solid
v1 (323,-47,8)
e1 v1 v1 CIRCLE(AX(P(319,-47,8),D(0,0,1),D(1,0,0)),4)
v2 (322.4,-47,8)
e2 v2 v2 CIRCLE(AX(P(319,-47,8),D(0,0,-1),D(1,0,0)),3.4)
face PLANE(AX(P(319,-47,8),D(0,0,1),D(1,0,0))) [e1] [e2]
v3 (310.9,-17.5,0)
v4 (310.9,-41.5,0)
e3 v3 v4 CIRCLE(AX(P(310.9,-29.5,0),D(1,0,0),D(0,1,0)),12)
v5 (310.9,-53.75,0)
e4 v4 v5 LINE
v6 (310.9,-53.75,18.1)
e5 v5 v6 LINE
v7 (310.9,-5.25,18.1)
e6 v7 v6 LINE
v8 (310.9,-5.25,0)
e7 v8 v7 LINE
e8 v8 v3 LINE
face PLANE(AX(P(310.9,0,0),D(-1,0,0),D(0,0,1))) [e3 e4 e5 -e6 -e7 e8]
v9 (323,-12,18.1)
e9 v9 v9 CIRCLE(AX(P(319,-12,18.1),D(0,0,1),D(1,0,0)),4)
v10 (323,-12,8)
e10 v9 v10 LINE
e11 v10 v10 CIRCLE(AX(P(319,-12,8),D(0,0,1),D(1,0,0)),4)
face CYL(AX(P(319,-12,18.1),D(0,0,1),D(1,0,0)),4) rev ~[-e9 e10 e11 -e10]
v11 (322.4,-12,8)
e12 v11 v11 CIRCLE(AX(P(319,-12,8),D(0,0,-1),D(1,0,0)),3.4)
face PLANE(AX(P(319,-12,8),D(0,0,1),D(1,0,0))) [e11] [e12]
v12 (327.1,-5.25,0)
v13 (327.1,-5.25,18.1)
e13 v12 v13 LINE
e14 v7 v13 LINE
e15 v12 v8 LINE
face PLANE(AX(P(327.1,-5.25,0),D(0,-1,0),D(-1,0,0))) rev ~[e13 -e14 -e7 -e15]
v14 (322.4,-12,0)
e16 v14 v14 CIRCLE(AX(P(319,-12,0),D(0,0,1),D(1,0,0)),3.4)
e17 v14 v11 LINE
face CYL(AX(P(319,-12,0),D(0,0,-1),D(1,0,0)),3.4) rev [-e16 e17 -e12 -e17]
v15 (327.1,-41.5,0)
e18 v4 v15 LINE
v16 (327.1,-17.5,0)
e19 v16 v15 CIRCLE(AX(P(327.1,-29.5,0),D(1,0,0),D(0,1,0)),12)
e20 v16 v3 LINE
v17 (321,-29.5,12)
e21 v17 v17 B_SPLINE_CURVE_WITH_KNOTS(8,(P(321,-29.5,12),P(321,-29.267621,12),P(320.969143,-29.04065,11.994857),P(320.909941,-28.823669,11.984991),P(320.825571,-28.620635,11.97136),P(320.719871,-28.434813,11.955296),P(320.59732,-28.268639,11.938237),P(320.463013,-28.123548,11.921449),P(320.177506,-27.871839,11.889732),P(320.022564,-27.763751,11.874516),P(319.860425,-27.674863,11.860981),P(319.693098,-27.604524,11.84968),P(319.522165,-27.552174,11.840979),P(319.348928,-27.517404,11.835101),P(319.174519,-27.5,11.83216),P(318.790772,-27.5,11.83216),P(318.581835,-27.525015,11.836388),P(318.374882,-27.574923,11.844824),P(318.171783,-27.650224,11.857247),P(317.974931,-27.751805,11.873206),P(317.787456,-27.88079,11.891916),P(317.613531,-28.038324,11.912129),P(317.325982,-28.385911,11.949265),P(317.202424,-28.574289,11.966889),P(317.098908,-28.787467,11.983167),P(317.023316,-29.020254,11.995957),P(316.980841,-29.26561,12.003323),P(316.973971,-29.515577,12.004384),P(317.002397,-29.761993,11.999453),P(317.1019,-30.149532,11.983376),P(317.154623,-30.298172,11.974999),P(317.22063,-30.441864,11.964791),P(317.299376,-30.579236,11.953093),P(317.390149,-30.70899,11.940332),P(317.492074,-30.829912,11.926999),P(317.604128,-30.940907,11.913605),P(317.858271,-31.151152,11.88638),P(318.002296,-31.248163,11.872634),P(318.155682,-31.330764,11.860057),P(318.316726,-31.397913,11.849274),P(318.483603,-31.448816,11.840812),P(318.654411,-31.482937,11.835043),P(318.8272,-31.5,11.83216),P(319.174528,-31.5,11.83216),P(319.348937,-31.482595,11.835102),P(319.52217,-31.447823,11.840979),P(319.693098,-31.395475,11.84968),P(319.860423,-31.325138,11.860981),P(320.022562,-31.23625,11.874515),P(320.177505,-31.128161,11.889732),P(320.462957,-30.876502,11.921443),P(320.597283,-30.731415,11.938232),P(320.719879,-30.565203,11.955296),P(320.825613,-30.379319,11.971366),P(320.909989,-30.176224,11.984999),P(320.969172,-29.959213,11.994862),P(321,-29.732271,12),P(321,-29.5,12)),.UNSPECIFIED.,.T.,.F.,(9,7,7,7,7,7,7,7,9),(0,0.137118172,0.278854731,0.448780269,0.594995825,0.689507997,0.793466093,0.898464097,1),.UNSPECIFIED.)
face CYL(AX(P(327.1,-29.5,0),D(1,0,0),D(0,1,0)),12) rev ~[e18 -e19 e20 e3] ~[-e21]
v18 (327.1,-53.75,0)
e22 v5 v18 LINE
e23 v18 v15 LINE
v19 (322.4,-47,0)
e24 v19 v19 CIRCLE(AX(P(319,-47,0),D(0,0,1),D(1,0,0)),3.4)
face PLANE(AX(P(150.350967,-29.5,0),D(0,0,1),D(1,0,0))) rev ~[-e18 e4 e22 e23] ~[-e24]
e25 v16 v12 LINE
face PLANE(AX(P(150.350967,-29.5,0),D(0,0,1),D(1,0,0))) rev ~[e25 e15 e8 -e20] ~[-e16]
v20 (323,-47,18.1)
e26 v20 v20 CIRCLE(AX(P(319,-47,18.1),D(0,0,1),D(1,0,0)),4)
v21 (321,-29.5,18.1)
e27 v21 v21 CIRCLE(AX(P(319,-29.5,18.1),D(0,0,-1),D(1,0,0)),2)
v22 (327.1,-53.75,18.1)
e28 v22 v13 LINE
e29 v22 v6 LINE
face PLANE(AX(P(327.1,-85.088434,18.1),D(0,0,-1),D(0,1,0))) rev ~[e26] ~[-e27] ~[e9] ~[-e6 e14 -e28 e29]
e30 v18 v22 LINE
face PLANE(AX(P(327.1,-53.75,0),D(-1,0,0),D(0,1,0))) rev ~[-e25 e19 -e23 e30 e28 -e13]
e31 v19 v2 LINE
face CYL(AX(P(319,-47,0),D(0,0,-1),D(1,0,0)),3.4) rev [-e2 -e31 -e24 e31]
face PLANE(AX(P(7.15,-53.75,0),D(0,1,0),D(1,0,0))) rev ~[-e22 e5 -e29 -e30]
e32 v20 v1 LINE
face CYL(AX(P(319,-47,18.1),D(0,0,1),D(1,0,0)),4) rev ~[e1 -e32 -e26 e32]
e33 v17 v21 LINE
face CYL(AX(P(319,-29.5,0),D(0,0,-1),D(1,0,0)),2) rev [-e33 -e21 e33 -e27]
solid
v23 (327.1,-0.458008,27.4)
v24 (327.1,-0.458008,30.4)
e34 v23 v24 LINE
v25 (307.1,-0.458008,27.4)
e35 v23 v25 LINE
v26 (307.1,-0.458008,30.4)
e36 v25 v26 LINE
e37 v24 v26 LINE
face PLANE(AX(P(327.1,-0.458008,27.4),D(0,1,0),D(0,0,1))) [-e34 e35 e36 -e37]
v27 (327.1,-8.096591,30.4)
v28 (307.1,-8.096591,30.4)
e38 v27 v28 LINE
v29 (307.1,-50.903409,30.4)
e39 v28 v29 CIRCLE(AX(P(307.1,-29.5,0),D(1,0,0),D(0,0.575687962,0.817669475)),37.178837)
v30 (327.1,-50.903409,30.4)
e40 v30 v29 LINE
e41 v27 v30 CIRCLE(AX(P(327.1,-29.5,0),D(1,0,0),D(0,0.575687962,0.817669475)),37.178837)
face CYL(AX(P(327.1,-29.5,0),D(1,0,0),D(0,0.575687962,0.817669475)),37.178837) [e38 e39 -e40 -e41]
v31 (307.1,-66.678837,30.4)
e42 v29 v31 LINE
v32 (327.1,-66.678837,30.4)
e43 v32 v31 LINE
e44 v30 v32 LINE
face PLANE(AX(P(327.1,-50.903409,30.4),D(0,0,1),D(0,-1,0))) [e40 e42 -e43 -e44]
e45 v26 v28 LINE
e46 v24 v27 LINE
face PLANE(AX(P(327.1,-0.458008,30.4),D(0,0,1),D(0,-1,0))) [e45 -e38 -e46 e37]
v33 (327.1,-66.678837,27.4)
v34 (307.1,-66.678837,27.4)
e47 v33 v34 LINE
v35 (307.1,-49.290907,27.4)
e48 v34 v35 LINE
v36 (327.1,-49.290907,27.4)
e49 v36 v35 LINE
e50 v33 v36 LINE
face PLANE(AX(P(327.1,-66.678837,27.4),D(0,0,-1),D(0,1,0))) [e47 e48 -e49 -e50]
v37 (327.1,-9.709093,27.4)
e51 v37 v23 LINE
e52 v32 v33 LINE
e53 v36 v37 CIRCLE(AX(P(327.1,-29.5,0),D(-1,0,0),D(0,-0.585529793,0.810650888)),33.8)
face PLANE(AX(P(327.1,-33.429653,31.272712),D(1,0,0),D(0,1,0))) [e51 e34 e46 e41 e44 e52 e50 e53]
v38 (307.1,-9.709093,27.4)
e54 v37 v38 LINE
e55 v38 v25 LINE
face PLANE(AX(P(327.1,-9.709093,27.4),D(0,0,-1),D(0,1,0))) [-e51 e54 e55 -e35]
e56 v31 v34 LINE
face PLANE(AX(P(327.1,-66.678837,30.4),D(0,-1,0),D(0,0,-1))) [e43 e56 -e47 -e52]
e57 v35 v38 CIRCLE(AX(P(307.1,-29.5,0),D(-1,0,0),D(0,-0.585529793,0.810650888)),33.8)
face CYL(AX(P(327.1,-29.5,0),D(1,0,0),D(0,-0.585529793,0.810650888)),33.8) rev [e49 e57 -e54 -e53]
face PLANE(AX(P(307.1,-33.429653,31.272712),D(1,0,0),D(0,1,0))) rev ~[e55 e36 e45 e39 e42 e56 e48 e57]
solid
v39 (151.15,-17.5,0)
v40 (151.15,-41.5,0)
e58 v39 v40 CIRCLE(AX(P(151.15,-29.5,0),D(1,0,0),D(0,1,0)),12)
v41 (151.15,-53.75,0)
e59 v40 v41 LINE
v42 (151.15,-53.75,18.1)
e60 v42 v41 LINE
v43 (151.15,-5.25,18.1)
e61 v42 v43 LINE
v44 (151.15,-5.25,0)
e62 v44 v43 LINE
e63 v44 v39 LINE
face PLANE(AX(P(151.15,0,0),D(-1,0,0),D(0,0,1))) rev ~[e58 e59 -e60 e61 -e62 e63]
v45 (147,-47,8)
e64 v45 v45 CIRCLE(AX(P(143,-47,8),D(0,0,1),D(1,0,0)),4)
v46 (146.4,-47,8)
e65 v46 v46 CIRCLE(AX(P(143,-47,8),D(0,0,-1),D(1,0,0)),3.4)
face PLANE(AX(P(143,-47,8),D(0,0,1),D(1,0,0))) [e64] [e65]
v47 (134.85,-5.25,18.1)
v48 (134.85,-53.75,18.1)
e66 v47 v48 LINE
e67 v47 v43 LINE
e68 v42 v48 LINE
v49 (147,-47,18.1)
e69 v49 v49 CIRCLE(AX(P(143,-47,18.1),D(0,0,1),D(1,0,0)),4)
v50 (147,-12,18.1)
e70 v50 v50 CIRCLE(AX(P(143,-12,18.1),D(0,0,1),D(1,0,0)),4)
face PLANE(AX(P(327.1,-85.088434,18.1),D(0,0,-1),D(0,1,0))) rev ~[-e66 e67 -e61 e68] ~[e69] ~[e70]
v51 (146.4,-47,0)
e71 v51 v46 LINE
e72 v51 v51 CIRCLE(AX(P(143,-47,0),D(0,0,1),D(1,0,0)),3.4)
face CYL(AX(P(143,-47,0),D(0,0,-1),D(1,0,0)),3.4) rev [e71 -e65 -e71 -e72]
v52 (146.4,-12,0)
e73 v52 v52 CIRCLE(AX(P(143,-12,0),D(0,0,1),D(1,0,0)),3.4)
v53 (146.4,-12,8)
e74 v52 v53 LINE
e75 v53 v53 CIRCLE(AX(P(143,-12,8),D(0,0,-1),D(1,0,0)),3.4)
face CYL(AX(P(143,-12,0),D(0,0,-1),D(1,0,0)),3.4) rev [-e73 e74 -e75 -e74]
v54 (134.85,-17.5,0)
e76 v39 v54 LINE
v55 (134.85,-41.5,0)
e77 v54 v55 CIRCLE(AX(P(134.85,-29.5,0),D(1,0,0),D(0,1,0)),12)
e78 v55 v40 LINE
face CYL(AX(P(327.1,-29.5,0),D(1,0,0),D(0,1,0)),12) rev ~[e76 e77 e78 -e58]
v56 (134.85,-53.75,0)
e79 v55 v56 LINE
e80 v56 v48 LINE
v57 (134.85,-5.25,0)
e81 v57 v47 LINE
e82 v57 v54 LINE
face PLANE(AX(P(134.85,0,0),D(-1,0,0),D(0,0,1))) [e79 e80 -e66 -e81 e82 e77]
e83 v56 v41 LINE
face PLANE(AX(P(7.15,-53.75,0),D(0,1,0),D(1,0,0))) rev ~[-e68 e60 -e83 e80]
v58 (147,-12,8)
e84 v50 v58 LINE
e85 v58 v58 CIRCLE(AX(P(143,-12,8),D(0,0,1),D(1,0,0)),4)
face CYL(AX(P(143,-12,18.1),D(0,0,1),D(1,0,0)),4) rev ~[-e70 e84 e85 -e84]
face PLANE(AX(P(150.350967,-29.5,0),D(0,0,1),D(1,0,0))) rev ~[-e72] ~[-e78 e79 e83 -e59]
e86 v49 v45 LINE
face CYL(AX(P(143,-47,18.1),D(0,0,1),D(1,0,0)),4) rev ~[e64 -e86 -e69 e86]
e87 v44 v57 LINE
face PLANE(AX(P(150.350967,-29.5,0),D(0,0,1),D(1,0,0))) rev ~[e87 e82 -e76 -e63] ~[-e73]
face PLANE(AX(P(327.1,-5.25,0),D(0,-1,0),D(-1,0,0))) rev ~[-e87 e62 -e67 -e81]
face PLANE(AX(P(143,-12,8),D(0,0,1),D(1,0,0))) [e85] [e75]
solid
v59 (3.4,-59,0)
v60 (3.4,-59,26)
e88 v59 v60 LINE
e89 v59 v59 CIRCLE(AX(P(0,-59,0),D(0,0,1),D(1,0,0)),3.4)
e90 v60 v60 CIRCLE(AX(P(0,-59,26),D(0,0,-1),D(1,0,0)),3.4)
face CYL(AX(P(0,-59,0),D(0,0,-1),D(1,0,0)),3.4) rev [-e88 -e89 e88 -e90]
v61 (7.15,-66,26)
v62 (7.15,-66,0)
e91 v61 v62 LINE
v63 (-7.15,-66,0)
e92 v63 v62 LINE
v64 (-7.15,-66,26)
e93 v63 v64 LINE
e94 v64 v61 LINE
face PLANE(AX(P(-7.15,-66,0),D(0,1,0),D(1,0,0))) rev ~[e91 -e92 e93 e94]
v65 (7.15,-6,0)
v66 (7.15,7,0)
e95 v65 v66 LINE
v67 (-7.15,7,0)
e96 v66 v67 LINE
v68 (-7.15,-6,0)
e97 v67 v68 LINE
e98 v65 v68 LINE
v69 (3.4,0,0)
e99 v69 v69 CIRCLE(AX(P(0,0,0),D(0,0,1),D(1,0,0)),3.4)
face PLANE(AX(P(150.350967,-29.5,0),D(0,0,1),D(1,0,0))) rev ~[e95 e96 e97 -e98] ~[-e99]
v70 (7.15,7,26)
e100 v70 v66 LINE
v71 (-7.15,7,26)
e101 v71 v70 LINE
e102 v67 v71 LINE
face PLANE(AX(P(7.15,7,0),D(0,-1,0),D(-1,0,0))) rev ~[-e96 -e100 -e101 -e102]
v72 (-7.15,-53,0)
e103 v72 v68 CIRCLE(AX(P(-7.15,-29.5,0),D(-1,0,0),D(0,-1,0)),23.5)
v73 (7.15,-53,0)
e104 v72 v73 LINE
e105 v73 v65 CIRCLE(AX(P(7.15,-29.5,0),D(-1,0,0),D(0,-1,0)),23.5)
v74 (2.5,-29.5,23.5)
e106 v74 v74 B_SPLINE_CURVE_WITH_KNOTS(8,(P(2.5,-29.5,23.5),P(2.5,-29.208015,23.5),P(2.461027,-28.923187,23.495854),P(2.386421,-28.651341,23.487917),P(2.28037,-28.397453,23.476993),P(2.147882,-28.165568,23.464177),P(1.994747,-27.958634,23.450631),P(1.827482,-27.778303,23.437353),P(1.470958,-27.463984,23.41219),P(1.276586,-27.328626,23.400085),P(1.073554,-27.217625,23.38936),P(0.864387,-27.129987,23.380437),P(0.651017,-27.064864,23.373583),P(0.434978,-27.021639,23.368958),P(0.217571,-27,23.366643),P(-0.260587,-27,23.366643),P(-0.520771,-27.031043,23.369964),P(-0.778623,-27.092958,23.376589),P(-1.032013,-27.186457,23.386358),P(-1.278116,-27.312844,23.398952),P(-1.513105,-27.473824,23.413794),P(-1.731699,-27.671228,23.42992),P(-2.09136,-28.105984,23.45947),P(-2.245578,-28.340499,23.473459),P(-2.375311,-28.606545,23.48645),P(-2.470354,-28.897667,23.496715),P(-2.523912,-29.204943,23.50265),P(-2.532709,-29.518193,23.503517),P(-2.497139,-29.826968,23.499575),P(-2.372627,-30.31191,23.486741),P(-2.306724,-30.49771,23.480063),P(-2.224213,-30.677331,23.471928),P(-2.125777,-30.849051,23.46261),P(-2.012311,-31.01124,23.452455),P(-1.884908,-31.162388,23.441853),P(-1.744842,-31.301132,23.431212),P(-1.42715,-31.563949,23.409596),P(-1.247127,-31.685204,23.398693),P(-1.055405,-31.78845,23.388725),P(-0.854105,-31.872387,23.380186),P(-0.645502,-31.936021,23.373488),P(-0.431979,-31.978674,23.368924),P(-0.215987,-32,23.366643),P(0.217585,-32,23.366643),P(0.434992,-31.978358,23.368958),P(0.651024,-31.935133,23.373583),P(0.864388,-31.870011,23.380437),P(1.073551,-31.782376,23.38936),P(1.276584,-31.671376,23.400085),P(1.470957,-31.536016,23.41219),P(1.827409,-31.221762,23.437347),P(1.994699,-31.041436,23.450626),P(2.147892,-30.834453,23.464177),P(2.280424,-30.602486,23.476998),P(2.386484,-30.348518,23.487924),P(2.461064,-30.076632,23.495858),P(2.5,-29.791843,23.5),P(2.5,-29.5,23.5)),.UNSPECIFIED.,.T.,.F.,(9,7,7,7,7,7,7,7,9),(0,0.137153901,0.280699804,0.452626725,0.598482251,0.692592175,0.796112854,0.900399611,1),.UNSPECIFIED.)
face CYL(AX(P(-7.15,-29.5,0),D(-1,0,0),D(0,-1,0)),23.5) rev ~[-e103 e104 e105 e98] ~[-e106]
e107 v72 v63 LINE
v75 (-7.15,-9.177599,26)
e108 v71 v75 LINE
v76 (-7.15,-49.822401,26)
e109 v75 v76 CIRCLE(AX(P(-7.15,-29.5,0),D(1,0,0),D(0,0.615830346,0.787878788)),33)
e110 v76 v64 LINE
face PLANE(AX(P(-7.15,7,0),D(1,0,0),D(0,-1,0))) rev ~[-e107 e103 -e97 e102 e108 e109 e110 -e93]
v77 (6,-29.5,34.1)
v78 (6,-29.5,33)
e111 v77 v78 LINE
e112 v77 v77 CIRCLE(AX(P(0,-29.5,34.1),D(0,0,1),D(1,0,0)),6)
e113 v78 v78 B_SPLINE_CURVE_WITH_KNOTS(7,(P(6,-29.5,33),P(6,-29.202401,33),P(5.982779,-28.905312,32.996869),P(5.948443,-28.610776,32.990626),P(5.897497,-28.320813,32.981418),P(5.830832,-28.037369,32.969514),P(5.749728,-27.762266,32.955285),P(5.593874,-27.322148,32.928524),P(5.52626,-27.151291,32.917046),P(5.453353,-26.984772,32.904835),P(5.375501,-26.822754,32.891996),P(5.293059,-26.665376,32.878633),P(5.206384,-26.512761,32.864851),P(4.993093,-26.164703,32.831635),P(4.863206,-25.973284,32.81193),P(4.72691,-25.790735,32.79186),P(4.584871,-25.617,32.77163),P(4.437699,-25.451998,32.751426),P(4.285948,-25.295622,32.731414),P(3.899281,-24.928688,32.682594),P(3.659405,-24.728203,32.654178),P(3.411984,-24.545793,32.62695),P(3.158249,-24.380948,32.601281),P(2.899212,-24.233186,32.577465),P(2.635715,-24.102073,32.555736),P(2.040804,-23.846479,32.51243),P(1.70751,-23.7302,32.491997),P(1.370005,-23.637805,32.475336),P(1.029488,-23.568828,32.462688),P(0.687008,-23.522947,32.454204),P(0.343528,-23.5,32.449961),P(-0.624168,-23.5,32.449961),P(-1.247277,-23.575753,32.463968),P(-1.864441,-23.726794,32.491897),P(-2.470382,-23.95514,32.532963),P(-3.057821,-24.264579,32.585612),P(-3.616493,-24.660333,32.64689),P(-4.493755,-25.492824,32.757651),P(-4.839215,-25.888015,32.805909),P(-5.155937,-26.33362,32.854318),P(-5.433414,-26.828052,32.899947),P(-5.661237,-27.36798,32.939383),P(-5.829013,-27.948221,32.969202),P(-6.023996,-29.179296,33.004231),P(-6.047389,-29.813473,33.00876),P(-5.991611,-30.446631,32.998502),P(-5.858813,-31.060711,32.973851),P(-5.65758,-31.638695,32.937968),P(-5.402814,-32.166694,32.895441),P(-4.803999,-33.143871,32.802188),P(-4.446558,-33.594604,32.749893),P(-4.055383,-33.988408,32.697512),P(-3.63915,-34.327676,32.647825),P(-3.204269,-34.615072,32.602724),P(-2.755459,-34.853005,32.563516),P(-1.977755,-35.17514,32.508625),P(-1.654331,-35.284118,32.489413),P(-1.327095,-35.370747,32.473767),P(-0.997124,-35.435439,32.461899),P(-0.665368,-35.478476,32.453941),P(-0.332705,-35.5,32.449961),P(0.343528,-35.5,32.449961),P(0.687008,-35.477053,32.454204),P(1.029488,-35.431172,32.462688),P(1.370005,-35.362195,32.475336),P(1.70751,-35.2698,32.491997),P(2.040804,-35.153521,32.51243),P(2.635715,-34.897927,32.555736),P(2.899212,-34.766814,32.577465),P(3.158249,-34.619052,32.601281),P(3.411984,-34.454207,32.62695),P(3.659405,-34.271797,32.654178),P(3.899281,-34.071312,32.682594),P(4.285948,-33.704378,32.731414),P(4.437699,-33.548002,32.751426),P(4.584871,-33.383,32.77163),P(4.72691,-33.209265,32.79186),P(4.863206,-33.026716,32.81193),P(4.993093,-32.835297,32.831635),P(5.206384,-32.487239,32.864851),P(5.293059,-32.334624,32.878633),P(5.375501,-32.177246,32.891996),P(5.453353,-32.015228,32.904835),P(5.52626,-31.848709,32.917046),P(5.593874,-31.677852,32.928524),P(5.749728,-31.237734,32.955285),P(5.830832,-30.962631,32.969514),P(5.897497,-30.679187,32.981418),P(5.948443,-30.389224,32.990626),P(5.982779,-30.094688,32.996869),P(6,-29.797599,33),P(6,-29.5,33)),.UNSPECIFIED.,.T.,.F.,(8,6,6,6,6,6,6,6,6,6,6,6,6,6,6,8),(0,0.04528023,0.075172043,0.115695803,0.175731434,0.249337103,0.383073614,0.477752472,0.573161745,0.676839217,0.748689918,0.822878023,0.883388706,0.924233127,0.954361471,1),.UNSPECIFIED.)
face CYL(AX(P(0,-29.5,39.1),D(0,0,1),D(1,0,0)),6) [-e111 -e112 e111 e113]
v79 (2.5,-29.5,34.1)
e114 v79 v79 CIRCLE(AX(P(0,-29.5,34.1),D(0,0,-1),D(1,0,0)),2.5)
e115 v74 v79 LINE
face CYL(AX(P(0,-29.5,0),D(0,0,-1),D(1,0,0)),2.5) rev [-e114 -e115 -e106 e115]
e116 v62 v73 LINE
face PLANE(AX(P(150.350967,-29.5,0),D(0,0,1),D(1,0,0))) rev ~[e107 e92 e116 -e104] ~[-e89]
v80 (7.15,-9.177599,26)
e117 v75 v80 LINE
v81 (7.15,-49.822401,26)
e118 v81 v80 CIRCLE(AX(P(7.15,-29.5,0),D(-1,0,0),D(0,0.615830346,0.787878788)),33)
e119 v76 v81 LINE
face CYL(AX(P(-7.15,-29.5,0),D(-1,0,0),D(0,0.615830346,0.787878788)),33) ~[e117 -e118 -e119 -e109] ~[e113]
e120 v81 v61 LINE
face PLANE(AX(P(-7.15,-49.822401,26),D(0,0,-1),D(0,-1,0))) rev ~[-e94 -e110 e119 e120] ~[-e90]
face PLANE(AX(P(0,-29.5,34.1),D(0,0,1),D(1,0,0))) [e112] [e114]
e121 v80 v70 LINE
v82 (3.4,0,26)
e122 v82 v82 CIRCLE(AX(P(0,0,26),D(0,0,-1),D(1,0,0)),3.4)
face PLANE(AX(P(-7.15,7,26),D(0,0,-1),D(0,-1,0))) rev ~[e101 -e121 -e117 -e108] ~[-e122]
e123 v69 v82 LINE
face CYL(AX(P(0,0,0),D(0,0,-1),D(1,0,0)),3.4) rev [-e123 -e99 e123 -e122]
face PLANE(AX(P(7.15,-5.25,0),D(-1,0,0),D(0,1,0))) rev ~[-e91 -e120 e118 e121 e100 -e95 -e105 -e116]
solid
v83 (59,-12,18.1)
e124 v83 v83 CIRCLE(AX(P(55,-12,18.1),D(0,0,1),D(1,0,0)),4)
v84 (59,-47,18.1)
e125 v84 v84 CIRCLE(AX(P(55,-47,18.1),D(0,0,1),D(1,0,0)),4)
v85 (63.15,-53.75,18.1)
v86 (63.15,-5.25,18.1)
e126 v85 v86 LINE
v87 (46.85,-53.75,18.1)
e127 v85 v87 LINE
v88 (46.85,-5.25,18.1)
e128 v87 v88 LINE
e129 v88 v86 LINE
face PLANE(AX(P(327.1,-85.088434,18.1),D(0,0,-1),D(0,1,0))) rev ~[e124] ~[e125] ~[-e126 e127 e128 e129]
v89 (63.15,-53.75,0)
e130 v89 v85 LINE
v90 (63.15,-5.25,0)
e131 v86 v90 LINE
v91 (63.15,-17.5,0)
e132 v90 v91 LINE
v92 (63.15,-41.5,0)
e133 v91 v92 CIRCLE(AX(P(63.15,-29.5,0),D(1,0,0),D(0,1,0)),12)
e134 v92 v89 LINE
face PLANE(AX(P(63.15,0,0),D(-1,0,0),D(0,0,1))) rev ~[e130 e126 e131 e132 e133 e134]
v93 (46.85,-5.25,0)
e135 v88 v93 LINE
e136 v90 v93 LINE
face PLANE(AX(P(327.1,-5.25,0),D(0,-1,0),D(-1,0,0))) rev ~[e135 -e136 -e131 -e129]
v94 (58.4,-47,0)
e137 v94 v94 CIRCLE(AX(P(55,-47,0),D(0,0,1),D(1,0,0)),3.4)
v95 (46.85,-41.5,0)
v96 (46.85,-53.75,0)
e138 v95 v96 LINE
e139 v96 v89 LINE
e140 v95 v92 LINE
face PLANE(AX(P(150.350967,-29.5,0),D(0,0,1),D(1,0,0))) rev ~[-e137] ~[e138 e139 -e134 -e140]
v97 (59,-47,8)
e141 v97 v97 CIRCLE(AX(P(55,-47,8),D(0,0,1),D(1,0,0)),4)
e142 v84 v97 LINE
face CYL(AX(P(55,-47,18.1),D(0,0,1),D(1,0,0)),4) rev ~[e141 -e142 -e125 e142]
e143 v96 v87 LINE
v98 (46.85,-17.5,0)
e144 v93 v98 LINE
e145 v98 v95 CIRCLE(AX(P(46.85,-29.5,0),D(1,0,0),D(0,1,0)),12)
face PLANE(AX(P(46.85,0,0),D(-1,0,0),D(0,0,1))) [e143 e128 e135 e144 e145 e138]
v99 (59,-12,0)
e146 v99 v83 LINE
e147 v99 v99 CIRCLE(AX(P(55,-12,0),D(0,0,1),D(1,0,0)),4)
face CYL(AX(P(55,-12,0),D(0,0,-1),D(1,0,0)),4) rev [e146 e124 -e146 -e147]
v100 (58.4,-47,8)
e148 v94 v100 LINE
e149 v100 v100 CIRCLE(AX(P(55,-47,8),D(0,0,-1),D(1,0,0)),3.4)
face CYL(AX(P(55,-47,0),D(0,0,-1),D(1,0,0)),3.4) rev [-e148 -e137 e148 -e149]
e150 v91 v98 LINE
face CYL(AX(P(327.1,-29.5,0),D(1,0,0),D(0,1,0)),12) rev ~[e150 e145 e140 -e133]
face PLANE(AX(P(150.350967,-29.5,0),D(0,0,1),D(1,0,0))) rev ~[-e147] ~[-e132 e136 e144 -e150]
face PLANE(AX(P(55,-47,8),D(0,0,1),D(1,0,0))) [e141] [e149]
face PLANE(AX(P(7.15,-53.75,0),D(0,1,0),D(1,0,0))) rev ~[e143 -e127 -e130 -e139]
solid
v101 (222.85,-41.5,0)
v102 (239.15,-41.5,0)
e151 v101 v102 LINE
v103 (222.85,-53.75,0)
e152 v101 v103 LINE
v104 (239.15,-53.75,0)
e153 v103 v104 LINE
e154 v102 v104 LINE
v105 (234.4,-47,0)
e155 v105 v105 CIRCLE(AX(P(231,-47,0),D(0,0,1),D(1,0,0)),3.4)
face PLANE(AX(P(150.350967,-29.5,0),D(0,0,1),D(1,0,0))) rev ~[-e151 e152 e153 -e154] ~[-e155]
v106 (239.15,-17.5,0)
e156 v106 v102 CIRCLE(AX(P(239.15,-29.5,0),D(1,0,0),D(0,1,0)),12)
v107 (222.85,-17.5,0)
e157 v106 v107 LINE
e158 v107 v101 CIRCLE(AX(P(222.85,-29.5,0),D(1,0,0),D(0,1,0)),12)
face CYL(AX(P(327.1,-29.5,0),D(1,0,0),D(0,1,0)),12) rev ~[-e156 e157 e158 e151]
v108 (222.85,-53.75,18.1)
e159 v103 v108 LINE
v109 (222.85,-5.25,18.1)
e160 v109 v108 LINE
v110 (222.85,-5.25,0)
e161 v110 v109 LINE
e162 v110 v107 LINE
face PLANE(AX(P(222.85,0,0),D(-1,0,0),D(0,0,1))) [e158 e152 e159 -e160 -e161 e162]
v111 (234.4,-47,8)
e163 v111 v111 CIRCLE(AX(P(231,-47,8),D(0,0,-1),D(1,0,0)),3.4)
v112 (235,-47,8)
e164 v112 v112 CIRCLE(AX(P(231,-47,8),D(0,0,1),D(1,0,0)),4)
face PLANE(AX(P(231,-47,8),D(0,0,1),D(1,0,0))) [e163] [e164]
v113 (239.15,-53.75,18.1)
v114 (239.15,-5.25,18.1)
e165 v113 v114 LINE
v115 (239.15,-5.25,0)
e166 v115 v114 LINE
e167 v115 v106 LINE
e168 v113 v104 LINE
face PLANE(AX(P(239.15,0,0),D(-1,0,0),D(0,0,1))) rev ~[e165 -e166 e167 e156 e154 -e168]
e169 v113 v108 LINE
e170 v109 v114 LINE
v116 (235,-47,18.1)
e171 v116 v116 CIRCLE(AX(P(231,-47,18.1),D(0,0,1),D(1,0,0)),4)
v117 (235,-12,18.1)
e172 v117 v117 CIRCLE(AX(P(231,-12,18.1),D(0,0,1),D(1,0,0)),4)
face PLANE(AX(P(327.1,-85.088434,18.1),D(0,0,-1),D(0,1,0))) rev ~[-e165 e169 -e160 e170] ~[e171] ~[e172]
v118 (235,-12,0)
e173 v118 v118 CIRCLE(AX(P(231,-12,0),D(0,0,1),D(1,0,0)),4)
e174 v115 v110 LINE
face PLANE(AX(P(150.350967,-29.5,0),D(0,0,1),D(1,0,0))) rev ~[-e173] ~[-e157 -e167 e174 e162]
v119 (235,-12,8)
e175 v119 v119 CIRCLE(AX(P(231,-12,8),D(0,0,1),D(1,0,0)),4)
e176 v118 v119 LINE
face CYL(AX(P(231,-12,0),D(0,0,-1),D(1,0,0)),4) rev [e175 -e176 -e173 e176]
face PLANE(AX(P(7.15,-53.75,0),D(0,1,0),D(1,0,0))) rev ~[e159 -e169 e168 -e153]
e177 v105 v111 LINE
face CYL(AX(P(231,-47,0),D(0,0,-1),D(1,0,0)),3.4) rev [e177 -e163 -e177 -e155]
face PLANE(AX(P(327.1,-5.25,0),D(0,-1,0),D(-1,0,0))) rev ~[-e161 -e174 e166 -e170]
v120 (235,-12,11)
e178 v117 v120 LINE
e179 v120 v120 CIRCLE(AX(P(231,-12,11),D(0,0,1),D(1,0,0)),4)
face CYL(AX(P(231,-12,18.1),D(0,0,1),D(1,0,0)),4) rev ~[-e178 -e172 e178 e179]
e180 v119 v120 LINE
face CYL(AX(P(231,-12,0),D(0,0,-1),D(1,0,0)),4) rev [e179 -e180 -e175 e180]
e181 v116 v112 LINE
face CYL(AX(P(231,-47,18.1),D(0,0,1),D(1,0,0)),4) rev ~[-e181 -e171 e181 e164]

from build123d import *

# Parameters (mm, degrees)
F2_DEPTH       = 39.1
F0_R           = 4
F0_R_2         = 3.4
F3_DEPTH       = 11
F4_R           = 12
F5_DEPTH       = 334.25
F6_R           = 23.5
F7_DEPTH       = 14.3
F8_W           = 39.7
F8_H           = 15.3
F8_W_2         = 71.7
F8_W_3         = 71.75
F9_DEPTH       = 53.75
F22_DEPTH      = 514
F16_R          = 24.75
F23_DEPTH      = 39.7
F17_R          = 25
F24_DEPTH      = 71.7
F18_R          = 25
F25_DEPTH      = 71.7
F19_R          = 25
F26_DEPTH      = 71.75
F28_DEPTH      = 18
F30_R          = 50
F30_R_2        = 30.8
F31_DEPTH      = 319.95
F32_END_RADIUS = 30.8
F15_R          = 6.5
F15_R_2        = 6
F32_REACH      = 57.4857763109
F0_R_3         = 2.5
F0_R_4         = 3
F0_R_5         = 2
F33_DEPTH      = 39.1010001
F35_DEPTH      = 20
F36_W          = 116.0697114092
F36_H          = 45.8095933202
F37_DEPTH      = 319.95
F38_W          = 39.7
F38_H          = 22.9808008298
F38_W_2        = 71.7
F38_H_2        = 22.1049790271
F38_H_3        = 21.3201404549
F38_W_3        = 71.75
F38_H_4        = 20.5597863533
F39_DEPTH      = 7.001
F39_DEPTH_BACK = 66.6798368476
F40_R          = 4
F41_DEPTH      = 10.1
F42_R          = 10
F43_DEPTH      = 5


# Not quite as in the source:
# - an extrude ends at something that could not be found from the text; its depth is read off the source's solid


with BuildPart() as f2:
    # F1 (on Top) → F2 (new body)
    with BuildSketch(Plane.XY):
        Polygon((7.15, 7), (-7.15, 7), (-7.15, -66), (7.15, -66), (7.15, -53.75), (327.1, -53.75), (327.1, -5.25), (7.15, -5.25), align=None)
    extrude(amount=F2_DEPTH)

    # F0 (on Top) → F3 (cut)
    with BuildSketch(Plane.XY):
        with Locations((55, -12)):
            Circle(F0_R)
        with Locations((55, -12)):
            Circle(F0_R_2, mode=Mode.SUBTRACT)
        with Locations((231, -12)):
            Circle(F0_R)
        with Locations((231, -12)):
            Circle(F0_R_2, mode=Mode.SUBTRACT)
    extrude(amount=F3_DEPTH, mode=Mode.SUBTRACT)

    # F4 (on face) → F5 (cut, through all)
    with BuildSketch(Plane.YZ.offset(327.1)):
        with Locations((-29.5, 0)):
            Circle(F4_R)
    extrude(amount=-F5_DEPTH, mode=Mode.SUBTRACT)

    # F6 (on face) → F7 (cut)
    with BuildSketch(Plane(origin=(-7.15, 0, 0), x_dir=(0, -1, 0), z_dir=(-1, 0, 0))):
        with Locations((29.5, 0)):
            Circle(F6_R)
    extrude(amount=-F7_DEPTH, mode=Mode.SUBTRACT)

    # F8 (on Front) → F9 (cut, through all)
    with BuildSketch(Plane.XZ):
        with Locations((27, 7.65)):
            Rectangle(F8_W, F8_H)
        with Locations((99, 7.65)):
            Rectangle(F8_W_2, F8_H)
        with Locations((187, 7.65)):
            Rectangle(F8_W_2, F8_H)
        with Locations((275.025, 7.65)):
            Rectangle(F8_W_3, F8_H)
    extrude(amount=F9_DEPTH, mode=Mode.SUBTRACT)

    # F21 (on offset) → F22 (cut, through all)
    with BuildSketch(Plane(origin=(-7.15, 0, 0), x_dir=(0, -1, 0), z_dir=(-1, 0, 0))):
        with BuildLine():
            ThreePointArc((9.1775985671, 26), (29.5, 33), (49.8224014329, 26))
            Line((49.8224014329, 26), (66, 26))
            Line((66, 26), (66, 39.1))
            Line((66, 39.1), (-7, 39.1))
            Line((-7, 39.1), (-7, 26))
            Line((-7, 26), (9.1775985671, 26))
        make_face()
    extrude(amount=-F22_DEPTH, mode=Mode.SUBTRACT)

    # F16 (on offset) → F23 (cut, through all)
    with BuildSketch(Plane.YZ.offset(7.15)):
        with Locations((-29.5, 0)):
            Circle(F16_R)
    extrude(amount=F23_DEPTH, mode=Mode.SUBTRACT)

    # F17 (on offset) → F24 (cut, through all)
    with BuildSketch(Plane.YZ.offset(63.15)):
        with Locations((-29.5, 0)):
            Circle(F17_R)
    extrude(amount=F24_DEPTH, mode=Mode.SUBTRACT)

    # F18 (on offset) → F25 (cut, through all)
    with BuildSketch(Plane.YZ.offset(151.15)):
        with Locations((-29.5, 0)):
            Circle(F18_R)
    extrude(amount=F25_DEPTH, mode=Mode.SUBTRACT)

    # F19 (on offset) → F26 (cut, through all)
    with BuildSketch(Plane.YZ.offset(239.15)):
        with Locations((-29.5, 0)):
            Circle(F19_R)
    extrude(amount=F26_DEPTH, mode=Mode.SUBTRACT)

    # F27 (on face) → F28 (cut)
    with BuildSketch(Plane.XY.offset(39.1)):
        with BuildLine():
            Line((63.1, -59), (63.1, -47))
            ThreePointArc((63.1, -47), (55, -38.9), (46.9, -47))
            Line((46.9, -47), (46.9, -59))
            Line((46.9, -59), (63.1, -59))
        make_face()
        with BuildLine():
            Line((63.1, -12), (63.1, 0))
            Line((63.1, 0), (46.9, 0))
            Line((46.9, 0), (46.9, -12))
            ThreePointArc((46.9, -12), (55, -20.1), (63.1, -12))
        make_face()
        with BuildLine():
            Line((151.1, -12), (151.1, 0))
            Line((151.1, 0), (134.9, 0))
            Line((134.9, 0), (134.9, -12))
            ThreePointArc((134.9, -12), (143, -20.1), (151.1, -12))
        make_face()
        with BuildLine():
            Line((151.1, -59), (151.1, -47))
            ThreePointArc((151.1, -47), (143, -38.9), (134.9, -47))
            Line((134.9, -47), (134.9, -59))
            Line((134.9, -59), (151.1, -59))
        make_face()
        with BuildLine():
            Line((239.1, -12), (239.1, 0))
            Line((239.1, 0), (222.9, 0))
            Line((222.9, 0), (222.9, -12))
            ThreePointArc((222.9, -12), (231, -20.1), (239.1, -12))
        make_face()
        with BuildLine():
            Line((239.1, -59), (239.1, -47))
            ThreePointArc((239.1, -47), (231, -38.9), (222.9, -47))
            Line((222.9, -47), (222.9, -59))
            Line((222.9, -59), (239.1, -59))
        make_face()
        with BuildLine():
            ThreePointArc((310.9, -12), (319, -20.1), (327.1, -12))
            Line((327.1, -12), (327.1, 0))
            Line((327.1, 0), (310.9, 0))
            Line((310.9, 0), (310.9, -12))
        make_face()
        with BuildLine():
            Line((327.1, -59), (327.1, -47))
            ThreePointArc((327.1, -47), (319, -38.9), (310.9, -47))
            Line((310.9, -47), (310.9, -59))
            Line((310.9, -59), (327.1, -59))
        make_face()
    extrude(amount=-F28_DEPTH, mode=Mode.SUBTRACT)

    # F30 (on offset) → F31 (cut, through all)
    with BuildSketch(Plane.YZ.offset(327.1)):
        with Locations((-29.5, 0)):
            Circle(F30_R)
        with Locations((-29.5, 0)):
            Circle(F30_R_2, mode=Mode.SUBTRACT)
    extrude(amount=-F31_DEPTH, mode=Mode.SUBTRACT)

    f32_end = (Plane(origin=(167.125, -29.5, 0), x_dir=(0, 0, 1), z_dir=(1, 0, 0)) * Cylinder(F32_END_RADIUS, 802.4046404691, mode=Mode.PRIVATE)).faces().sort_by_distance((167.125, -29.5, 30.8))[0]
    # F15 (on offset) → F32 (join, up to the whole of a round face its end follows)
    with BuildSketch(Plane.XY.offset(39.1)):
        with Locations((27.5, -22)):
            Circle(F15_R)
        with Locations((162.5, -22)):
            Circle(F15_R)
        with Locations((298.5, -22)):
            Circle(F15_R)
        with Locations((0, -29.5)):
            Circle(F15_R_2)
    f32_long = extrude(amount=-F32_REACH, mode=Mode.PRIVATE)
    add(split(f32_long, bisect_by=f32_end, keep=Keep.TOP, mode=Mode.PRIVATE))

    # F0 (on Top) → F33 (cut, through all)
    with BuildSketch(Plane.XY):
        Circle(F0_R_2)
        with Locations((143, -12)):
            Circle(F0_R_2)
        with Locations((319, -12)):
            Circle(F0_R_2)
        with Locations((231, -47)):
            Circle(F0_R_2)
        with Locations((319, -47)):
            Circle(F0_R_2)
        with Locations((143, -47)):
            Circle(F0_R_2)
        with Locations((55, -47)):
            Circle(F0_R_2)
        with Locations((0, -59)):
            Circle(F0_R_2)
        with Locations((0, -29.5)):
            Circle(F0_R_3)
        with Locations((27.5, -22)):
            Circle(F0_R_4)
        with Locations((162.5, -22)):
            Circle(F0_R_4)
        with Locations((298.5, -22)):
            Circle(F0_R_4)
        with Locations((55, -12)):
            Circle(F0_R_2)
        with Locations((231, -12)):
            Circle(F0_R_2)
        with Locations((319, -29.5)):
            Circle(F0_R_5)
    extrude(amount=F33_DEPTH, mode=Mode.SUBTRACT)

    # F36 (on offset) → F37 (cut, through all)
    with BuildSketch(Plane.YZ.offset(327.1)):
        with Locations((-27.0535778254, 41.0047966601)):
            Rectangle(F36_W, F36_H)
    extrude(amount=-F37_DEPTH, mode=Mode.SUBTRACT)

    # F38 (on Front) → F39 (cut, two sides)
    with BuildSketch(Plane.XZ) as f39_sk:
        with Locations((27, 11.4904004149)):
            Rectangle(F38_W, F38_H)
        with Locations((99, 11.0524895135)):
            Rectangle(F38_W_2, F38_H_2)
        with Locations((187, 10.6600702275)):
            Rectangle(F38_W_2, F38_H_3)
        with Locations((275.025, 10.2798931766)):
            Rectangle(F38_W_3, F38_H_4)
    extrude(amount=-F39_DEPTH, mode=Mode.SUBTRACT)
    extrude(f39_sk.sketch, amount=F39_DEPTH_BACK, mode=Mode.SUBTRACT)

    # F40 (on face) → F41 (cut)
    with BuildSketch(Plane.XY.offset(18.1)):
        with Locations((55, -12)):
            Circle(F40_R)
        with Locations((143, -12)):
            Circle(F40_R)
        with Locations((231, -12)):
            Circle(F40_R)
        with Locations((319, -12)):
            Circle(F40_R)
        with Locations((319, -47)):
            Circle(F40_R)
        with Locations((231, -47)):
            Circle(F40_R)
        with Locations((143, -47)):
            Circle(F40_R)
        with Locations((55, -47)):
            Circle(F40_R)
    extrude(amount=-F41_DEPTH, mode=Mode.SUBTRACT)

    # F42 (on offset) → F43 (cut)
    with BuildSketch(Plane.XY.offset(39.1)):
        with Locations((0, -29.5)):
            Circle(F42_R)
    extrude(amount=-F43_DEPTH, mode=Mode.SUBTRACT)


with BuildPart() as f35:
    # F34 (on offset) → F35 (new body)
    with BuildSketch(Plane.YZ.offset(327.1)):
        with BuildLine():
            ThreePointArc((-49.290907003, 27.4), (-29.5, 33.8), (-9.709092997, 27.4))
            Line((-9.709092997, 27.4), (-0.4580076056, 27.4))
            Line((-0.4580076056, 27.4), (-0.4580076056, 30.4))
            Line((-0.4580076056, 30.4), (-8.0965911747, 30.4))
            ThreePointArc((-8.0965911747, 30.4), (-29.5, 37.1788368476), (-50.9034088253, 30.4))
            Line((-50.9034088253, 30.4), (-66.6788368476, 30.4))
            Line((-66.6788368476, 30.4), (-66.6788368476, 27.4))
            Line((-66.6788368476, 27.4), (-49.290907003, 27.4))
        make_face()
    extrude(amount=-F35_DEPTH)


solid = Compound([f2.part, f35.part])
